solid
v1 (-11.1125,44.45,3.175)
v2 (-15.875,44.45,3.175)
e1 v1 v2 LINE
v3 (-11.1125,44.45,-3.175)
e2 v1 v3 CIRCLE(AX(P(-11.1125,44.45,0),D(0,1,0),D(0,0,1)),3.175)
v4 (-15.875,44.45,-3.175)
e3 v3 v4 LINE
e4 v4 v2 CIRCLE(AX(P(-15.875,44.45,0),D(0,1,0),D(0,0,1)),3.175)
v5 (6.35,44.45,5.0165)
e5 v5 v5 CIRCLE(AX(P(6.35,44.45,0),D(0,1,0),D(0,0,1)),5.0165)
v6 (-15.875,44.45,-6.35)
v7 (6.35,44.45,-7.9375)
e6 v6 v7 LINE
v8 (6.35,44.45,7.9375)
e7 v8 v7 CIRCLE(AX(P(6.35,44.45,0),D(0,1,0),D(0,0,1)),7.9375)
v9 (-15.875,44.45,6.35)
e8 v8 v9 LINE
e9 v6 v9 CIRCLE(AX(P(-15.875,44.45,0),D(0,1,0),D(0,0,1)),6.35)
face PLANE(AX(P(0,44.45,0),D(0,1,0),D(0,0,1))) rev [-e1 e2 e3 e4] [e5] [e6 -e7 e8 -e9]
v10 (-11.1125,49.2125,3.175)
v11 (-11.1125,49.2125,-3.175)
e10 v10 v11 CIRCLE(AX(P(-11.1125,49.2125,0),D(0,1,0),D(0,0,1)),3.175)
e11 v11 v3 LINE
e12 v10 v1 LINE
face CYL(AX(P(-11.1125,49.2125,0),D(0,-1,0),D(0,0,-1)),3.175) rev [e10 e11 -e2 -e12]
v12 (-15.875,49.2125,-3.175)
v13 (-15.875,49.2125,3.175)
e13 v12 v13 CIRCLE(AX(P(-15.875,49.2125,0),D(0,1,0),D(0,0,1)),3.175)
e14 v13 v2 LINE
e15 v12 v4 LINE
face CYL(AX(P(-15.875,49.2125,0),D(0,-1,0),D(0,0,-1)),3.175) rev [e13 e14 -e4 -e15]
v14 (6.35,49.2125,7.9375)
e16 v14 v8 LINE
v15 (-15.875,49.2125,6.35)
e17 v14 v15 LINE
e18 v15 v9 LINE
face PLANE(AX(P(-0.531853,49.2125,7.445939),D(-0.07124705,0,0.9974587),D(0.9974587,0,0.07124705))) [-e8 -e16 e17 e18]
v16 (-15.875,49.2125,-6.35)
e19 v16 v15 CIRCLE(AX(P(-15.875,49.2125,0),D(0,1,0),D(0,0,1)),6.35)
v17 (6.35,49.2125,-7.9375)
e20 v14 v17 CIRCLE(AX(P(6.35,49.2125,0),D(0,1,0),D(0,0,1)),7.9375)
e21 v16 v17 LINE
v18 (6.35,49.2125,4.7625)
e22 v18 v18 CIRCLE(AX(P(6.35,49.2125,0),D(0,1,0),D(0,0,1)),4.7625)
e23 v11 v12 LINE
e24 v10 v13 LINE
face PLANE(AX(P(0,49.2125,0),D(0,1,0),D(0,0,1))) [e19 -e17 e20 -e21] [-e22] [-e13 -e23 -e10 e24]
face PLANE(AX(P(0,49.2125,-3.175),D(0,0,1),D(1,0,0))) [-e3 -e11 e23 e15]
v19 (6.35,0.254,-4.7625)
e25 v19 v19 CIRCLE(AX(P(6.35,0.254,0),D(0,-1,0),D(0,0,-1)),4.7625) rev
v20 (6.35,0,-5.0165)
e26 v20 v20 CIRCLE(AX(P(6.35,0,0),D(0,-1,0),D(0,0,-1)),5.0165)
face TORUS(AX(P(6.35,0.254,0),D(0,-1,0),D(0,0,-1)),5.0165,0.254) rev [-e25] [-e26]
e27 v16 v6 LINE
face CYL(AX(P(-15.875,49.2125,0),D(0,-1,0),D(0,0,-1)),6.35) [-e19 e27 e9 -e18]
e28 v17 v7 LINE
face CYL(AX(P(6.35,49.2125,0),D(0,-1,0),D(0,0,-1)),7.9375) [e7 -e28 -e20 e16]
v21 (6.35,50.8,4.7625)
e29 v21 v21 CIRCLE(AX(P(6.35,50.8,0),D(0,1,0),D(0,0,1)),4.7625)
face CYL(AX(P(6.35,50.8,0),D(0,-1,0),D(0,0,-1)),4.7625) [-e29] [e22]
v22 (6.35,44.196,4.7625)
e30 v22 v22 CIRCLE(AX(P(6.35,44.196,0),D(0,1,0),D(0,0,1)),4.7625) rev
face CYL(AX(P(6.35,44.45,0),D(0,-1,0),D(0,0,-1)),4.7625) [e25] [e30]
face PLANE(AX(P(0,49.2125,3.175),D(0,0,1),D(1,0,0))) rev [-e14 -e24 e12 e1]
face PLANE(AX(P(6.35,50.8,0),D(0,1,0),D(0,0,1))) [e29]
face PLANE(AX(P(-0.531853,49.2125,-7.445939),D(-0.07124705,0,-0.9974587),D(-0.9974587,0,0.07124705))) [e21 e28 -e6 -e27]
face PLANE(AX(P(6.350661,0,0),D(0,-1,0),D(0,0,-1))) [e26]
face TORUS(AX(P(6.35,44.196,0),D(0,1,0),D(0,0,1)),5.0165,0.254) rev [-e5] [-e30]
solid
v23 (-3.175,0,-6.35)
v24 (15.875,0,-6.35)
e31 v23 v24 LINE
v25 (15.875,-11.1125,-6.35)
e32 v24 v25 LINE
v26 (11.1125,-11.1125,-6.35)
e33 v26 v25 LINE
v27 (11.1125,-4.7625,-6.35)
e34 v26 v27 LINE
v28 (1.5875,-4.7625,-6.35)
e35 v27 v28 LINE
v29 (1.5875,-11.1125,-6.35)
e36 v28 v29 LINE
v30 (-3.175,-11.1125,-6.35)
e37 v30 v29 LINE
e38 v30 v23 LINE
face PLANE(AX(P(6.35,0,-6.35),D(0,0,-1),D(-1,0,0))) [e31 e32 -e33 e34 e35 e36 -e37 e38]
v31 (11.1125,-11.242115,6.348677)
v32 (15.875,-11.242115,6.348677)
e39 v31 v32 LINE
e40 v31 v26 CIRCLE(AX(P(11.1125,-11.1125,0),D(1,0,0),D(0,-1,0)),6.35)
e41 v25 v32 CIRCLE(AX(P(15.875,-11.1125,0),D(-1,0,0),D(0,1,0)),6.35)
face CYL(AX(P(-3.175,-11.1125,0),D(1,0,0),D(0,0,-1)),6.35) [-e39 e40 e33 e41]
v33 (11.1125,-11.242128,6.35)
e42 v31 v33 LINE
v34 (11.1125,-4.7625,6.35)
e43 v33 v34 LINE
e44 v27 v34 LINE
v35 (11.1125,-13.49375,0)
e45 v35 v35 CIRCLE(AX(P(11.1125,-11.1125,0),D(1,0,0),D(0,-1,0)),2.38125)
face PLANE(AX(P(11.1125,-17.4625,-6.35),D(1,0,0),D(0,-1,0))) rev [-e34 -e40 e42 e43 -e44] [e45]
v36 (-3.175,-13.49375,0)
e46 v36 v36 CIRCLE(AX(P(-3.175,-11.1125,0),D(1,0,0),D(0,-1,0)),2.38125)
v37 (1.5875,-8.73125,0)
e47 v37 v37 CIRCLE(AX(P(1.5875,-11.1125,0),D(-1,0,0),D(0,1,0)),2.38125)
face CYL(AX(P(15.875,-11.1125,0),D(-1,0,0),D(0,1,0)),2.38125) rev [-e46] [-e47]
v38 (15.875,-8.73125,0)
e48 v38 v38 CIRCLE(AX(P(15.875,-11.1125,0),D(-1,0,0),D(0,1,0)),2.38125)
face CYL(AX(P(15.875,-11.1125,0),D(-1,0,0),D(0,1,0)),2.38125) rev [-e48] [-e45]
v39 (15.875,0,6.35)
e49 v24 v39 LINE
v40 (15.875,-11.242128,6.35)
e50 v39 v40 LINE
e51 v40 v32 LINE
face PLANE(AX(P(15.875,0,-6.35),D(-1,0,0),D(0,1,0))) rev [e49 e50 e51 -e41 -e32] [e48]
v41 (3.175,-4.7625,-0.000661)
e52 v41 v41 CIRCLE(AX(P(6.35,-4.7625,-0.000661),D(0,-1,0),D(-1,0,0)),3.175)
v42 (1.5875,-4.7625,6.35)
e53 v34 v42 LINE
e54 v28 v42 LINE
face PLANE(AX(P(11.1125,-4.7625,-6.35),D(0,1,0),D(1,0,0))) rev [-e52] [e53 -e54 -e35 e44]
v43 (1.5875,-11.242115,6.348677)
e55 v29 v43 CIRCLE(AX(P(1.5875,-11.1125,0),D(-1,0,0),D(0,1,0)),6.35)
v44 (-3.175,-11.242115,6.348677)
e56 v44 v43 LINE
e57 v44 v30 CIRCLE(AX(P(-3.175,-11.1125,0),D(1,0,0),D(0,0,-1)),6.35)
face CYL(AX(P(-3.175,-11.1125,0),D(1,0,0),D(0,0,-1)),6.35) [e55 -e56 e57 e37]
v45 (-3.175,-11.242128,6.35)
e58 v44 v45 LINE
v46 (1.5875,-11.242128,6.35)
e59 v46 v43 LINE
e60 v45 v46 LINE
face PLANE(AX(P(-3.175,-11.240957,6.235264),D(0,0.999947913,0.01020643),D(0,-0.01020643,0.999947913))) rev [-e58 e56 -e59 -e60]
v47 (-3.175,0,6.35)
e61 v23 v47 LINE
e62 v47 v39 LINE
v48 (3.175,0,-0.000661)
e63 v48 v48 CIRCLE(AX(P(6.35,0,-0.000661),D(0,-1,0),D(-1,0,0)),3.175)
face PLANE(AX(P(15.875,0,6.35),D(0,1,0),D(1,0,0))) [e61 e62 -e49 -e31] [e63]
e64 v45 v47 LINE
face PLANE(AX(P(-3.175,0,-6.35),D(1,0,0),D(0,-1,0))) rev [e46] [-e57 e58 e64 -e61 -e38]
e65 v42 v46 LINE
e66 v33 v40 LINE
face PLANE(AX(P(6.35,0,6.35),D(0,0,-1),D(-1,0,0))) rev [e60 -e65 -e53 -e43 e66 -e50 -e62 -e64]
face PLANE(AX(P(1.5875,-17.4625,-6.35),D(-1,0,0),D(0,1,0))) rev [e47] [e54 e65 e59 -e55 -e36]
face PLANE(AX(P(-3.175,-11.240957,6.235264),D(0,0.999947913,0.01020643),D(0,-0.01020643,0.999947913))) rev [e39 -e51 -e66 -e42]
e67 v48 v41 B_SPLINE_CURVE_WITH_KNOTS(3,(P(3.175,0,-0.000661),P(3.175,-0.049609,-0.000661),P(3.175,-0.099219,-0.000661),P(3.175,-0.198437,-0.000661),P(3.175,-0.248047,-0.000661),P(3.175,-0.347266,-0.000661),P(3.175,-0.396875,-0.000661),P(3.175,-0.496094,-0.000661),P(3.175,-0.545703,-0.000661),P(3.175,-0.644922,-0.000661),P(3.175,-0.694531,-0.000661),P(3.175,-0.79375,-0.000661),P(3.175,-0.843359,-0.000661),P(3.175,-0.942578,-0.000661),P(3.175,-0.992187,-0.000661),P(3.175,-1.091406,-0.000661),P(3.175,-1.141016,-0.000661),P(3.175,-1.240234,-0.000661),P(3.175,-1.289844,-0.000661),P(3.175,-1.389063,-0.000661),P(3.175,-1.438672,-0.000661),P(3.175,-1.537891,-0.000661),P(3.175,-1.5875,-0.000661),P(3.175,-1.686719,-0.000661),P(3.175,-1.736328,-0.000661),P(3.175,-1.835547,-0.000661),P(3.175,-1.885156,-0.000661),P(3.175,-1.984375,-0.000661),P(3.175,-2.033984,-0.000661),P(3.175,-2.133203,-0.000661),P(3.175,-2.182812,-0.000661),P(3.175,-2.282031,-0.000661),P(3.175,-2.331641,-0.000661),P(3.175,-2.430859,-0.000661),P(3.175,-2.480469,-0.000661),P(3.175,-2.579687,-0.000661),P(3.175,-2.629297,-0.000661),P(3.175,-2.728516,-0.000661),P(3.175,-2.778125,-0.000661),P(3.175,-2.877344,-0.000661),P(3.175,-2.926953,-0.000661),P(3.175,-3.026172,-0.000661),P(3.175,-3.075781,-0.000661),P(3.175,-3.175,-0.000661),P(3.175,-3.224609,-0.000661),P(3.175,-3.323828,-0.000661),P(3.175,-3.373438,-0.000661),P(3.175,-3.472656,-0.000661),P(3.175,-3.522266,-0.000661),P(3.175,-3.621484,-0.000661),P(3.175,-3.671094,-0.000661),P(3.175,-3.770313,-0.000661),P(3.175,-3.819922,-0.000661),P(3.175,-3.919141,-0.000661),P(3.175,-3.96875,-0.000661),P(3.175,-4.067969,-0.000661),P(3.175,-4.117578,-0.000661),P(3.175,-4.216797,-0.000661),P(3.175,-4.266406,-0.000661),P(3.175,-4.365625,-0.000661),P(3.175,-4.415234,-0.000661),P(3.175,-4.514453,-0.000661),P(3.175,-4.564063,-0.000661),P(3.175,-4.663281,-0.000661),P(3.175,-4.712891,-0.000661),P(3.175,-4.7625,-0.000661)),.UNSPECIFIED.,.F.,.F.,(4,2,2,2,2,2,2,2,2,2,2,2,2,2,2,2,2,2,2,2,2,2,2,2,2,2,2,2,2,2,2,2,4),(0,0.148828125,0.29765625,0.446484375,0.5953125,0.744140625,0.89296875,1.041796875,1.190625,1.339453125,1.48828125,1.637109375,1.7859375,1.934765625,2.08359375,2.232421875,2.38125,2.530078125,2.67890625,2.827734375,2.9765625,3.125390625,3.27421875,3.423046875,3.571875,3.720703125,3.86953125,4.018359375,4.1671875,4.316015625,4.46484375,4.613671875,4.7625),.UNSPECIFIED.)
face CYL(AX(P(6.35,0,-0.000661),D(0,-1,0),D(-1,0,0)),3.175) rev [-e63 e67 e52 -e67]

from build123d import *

# Parameters (mm, degrees)
BOSS_EXTRUDE1_DEPTH     = 12.7
CUT_EXTRUDE1_DEPTH      = 29.794641971
CUT_EXTRUDE1_DEPTH_BACK = 29.794641971
CUT_EXTRUDE2_DEPTH      = 29.794641971
CUT_EXTRUDE2_DEPTH_BACK = 29.794641971
SKETCH3_R               = 2.38125
SKETCH4_R               = 4.7625
BOSS_EXTRUDE2_DEPTH     = 44.45
BOSS_EXTRUDE3_DEPTH     = 4.7625
SKETCH6_R               = 4.7625
BOSS_EXTRUDE4_DEPTH     = 1.5875
SKETCH7_R               = 3.175
CUT_EXTRUDE3_DEPTH      = 4.7625
FILLET1_R               = 0.254
BODY_MOVE_COPY4_ANGLE   = 90


with BuildPart() as part:
    # Sketch1 → Boss-Extrude1 (new body)
    with BuildSketch(Plane(origin=(0, 0, 0), x_dir=(0, 0, -1), z_dir=(1, 0, 0))):
        Polygon((9.525, 0), (-9.525, 0), (-9.525, -17.4625), (-4.7625, -17.4625), (-4.7625, -4.7625), (4.7625, -4.7625), (4.7625, -17.4625), (9.525, -17.4625), align=None)
    extrude(amount=BOSS_EXTRUDE1_DEPTH)

    # Sketch2 → Cut-Extrude1 (cut, two sides: drawn at the far end of the back side and taken through both)
    with BuildSketch(Plane.XY.offset(9.525).offset(-CUT_EXTRUDE1_DEPTH_BACK)):
        with BuildLine():
            ThreePointArc((12.7, -11.1125), (10.840128061, -15.602628061), (6.35, -17.4625))
            Line((6.35, -17.4625), (12.7, -17.4625))
            Line((12.7, -17.4625), (12.7, -11.1125))
        make_face()
        with BuildLine():
            Line((0.001322974, -11.242114905), (0, -11.242128408))
            Line((0, -11.242128408), (0, -17.4625))
            Line((0, -17.4625), (6.35, -17.4625))
            ThreePointArc((6.35, -17.4625), (1.905933993, -15.648222359), (0.001322974, -11.242114905))
        make_face()
    extrude(amount=CUT_EXTRUDE1_DEPTH + CUT_EXTRUDE1_DEPTH_BACK, mode=Mode.SUBTRACT)

    # Sketch3 → Cut-Extrude2 (cut, two sides: drawn at the far end of the back side and taken through both)
    with BuildSketch(Plane(origin=(0, 0, -9.525), x_dir=(-1, 0, 0), z_dir=(0, 0, -1)).offset(-CUT_EXTRUDE2_DEPTH_BACK)):
        with Locations((-6.35, -11.1125)):
            Circle(SKETCH3_R)
    extrude(amount=CUT_EXTRUDE2_DEPTH + CUT_EXTRUDE2_DEPTH_BACK, mode=Mode.SUBTRACT)

    # Sketch4 → Boss-Extrude2 (add)
    with BuildSketch(Plane(origin=(0, 0, 0), x_dir=(1, 0, 0), z_dir=(0, 1, 0))):
        with Locations((6.35, 0)):
            Circle(SKETCH4_R)
    extrude(amount=BOSS_EXTRUDE2_DEPTH)

    # Sketch5 → Boss-Extrude3 (add)
    with BuildSketch(Plane(origin=(0, 44.45, 0), x_dir=(1, 0, 0), z_dir=(0, 1, 0))):
        with BuildLine():
            Line((6.35, 7.9375), (-15.875, 6.35))
            ThreePointArc((-15.875, 6.35), (-22.225, 0), (-15.875, -6.35))
            Line((-15.875, -6.35), (6.35, -7.9375))
            ThreePointArc((6.35, -7.9375), (14.2875, 0), (6.35, 7.9375))
        make_face()
        with BuildLine():
            Line((-11.1125, -3.175), (-15.875, -3.175))
            ThreePointArc((-15.875, -3.175), (-19.05, 0), (-15.875, 3.175))
            Line((-15.875, 3.175), (-11.1125, 3.175))
            ThreePointArc((-11.1125, 3.175), (-7.9375, 0), (-11.1125, -3.175))
        make_face(mode=Mode.SUBTRACT)
    extrude(amount=BOSS_EXTRUDE3_DEPTH)

    # Sketch6 → Boss-Extrude4 (add)
    with BuildSketch(Plane(origin=(0, 49.2125, 0), x_dir=(1, 0, 0), z_dir=(0, 1, 0))):
        with Locations((6.35, 0)):
            Circle(SKETCH6_R)
    extrude(amount=BOSS_EXTRUDE4_DEPTH)

    # Sketch7 → Cut-Extrude3 (cut)
    with BuildSketch(Plane.XZ.offset(4.7625)):
        with Locations((6.350661487, 0)):
            Circle(SKETCH7_R)
    extrude(amount=-CUT_EXTRUDE3_DEPTH, mode=Mode.SUBTRACT)

    # Fillet1
    fillet1_edges = [part.edges().sort_by_distance(p)[0] for p in [
        (1.5875, 0, 0),
        (1.5875, 44.45, 0),
    ]]
    fillet(fillet1_edges, radius=FILLET1_R)


with BuildPart() as body_2:
    # Split2: the piece on the far side of the plane
    add(part.part)
    split(bisect_by=Plane(origin=(12.7, 0, -9.525), x_dir=(0, 0, -1), z_dir=(0, -1, 0)), keep=Keep.BOTTOM)


with BuildPart() as part_1:
    add(part.part)

    # Split2
    split(bisect_by=Plane(origin=(12.7, 0, -9.525), x_dir=(0, 0, -1), z_dir=(0, -1, 0)), keep=Keep.TOP)


with BuildPart() as part_2:
    # Body-Move/Copy4: moved
    add(part_1.part.moved(Location((0, 0, 0))).rotate(Axis((6.35, 0, 0), (0, 1, 0)), BODY_MOVE_COPY4_ANGLE))


solid = Compound([body_2.part, part_2.part])
